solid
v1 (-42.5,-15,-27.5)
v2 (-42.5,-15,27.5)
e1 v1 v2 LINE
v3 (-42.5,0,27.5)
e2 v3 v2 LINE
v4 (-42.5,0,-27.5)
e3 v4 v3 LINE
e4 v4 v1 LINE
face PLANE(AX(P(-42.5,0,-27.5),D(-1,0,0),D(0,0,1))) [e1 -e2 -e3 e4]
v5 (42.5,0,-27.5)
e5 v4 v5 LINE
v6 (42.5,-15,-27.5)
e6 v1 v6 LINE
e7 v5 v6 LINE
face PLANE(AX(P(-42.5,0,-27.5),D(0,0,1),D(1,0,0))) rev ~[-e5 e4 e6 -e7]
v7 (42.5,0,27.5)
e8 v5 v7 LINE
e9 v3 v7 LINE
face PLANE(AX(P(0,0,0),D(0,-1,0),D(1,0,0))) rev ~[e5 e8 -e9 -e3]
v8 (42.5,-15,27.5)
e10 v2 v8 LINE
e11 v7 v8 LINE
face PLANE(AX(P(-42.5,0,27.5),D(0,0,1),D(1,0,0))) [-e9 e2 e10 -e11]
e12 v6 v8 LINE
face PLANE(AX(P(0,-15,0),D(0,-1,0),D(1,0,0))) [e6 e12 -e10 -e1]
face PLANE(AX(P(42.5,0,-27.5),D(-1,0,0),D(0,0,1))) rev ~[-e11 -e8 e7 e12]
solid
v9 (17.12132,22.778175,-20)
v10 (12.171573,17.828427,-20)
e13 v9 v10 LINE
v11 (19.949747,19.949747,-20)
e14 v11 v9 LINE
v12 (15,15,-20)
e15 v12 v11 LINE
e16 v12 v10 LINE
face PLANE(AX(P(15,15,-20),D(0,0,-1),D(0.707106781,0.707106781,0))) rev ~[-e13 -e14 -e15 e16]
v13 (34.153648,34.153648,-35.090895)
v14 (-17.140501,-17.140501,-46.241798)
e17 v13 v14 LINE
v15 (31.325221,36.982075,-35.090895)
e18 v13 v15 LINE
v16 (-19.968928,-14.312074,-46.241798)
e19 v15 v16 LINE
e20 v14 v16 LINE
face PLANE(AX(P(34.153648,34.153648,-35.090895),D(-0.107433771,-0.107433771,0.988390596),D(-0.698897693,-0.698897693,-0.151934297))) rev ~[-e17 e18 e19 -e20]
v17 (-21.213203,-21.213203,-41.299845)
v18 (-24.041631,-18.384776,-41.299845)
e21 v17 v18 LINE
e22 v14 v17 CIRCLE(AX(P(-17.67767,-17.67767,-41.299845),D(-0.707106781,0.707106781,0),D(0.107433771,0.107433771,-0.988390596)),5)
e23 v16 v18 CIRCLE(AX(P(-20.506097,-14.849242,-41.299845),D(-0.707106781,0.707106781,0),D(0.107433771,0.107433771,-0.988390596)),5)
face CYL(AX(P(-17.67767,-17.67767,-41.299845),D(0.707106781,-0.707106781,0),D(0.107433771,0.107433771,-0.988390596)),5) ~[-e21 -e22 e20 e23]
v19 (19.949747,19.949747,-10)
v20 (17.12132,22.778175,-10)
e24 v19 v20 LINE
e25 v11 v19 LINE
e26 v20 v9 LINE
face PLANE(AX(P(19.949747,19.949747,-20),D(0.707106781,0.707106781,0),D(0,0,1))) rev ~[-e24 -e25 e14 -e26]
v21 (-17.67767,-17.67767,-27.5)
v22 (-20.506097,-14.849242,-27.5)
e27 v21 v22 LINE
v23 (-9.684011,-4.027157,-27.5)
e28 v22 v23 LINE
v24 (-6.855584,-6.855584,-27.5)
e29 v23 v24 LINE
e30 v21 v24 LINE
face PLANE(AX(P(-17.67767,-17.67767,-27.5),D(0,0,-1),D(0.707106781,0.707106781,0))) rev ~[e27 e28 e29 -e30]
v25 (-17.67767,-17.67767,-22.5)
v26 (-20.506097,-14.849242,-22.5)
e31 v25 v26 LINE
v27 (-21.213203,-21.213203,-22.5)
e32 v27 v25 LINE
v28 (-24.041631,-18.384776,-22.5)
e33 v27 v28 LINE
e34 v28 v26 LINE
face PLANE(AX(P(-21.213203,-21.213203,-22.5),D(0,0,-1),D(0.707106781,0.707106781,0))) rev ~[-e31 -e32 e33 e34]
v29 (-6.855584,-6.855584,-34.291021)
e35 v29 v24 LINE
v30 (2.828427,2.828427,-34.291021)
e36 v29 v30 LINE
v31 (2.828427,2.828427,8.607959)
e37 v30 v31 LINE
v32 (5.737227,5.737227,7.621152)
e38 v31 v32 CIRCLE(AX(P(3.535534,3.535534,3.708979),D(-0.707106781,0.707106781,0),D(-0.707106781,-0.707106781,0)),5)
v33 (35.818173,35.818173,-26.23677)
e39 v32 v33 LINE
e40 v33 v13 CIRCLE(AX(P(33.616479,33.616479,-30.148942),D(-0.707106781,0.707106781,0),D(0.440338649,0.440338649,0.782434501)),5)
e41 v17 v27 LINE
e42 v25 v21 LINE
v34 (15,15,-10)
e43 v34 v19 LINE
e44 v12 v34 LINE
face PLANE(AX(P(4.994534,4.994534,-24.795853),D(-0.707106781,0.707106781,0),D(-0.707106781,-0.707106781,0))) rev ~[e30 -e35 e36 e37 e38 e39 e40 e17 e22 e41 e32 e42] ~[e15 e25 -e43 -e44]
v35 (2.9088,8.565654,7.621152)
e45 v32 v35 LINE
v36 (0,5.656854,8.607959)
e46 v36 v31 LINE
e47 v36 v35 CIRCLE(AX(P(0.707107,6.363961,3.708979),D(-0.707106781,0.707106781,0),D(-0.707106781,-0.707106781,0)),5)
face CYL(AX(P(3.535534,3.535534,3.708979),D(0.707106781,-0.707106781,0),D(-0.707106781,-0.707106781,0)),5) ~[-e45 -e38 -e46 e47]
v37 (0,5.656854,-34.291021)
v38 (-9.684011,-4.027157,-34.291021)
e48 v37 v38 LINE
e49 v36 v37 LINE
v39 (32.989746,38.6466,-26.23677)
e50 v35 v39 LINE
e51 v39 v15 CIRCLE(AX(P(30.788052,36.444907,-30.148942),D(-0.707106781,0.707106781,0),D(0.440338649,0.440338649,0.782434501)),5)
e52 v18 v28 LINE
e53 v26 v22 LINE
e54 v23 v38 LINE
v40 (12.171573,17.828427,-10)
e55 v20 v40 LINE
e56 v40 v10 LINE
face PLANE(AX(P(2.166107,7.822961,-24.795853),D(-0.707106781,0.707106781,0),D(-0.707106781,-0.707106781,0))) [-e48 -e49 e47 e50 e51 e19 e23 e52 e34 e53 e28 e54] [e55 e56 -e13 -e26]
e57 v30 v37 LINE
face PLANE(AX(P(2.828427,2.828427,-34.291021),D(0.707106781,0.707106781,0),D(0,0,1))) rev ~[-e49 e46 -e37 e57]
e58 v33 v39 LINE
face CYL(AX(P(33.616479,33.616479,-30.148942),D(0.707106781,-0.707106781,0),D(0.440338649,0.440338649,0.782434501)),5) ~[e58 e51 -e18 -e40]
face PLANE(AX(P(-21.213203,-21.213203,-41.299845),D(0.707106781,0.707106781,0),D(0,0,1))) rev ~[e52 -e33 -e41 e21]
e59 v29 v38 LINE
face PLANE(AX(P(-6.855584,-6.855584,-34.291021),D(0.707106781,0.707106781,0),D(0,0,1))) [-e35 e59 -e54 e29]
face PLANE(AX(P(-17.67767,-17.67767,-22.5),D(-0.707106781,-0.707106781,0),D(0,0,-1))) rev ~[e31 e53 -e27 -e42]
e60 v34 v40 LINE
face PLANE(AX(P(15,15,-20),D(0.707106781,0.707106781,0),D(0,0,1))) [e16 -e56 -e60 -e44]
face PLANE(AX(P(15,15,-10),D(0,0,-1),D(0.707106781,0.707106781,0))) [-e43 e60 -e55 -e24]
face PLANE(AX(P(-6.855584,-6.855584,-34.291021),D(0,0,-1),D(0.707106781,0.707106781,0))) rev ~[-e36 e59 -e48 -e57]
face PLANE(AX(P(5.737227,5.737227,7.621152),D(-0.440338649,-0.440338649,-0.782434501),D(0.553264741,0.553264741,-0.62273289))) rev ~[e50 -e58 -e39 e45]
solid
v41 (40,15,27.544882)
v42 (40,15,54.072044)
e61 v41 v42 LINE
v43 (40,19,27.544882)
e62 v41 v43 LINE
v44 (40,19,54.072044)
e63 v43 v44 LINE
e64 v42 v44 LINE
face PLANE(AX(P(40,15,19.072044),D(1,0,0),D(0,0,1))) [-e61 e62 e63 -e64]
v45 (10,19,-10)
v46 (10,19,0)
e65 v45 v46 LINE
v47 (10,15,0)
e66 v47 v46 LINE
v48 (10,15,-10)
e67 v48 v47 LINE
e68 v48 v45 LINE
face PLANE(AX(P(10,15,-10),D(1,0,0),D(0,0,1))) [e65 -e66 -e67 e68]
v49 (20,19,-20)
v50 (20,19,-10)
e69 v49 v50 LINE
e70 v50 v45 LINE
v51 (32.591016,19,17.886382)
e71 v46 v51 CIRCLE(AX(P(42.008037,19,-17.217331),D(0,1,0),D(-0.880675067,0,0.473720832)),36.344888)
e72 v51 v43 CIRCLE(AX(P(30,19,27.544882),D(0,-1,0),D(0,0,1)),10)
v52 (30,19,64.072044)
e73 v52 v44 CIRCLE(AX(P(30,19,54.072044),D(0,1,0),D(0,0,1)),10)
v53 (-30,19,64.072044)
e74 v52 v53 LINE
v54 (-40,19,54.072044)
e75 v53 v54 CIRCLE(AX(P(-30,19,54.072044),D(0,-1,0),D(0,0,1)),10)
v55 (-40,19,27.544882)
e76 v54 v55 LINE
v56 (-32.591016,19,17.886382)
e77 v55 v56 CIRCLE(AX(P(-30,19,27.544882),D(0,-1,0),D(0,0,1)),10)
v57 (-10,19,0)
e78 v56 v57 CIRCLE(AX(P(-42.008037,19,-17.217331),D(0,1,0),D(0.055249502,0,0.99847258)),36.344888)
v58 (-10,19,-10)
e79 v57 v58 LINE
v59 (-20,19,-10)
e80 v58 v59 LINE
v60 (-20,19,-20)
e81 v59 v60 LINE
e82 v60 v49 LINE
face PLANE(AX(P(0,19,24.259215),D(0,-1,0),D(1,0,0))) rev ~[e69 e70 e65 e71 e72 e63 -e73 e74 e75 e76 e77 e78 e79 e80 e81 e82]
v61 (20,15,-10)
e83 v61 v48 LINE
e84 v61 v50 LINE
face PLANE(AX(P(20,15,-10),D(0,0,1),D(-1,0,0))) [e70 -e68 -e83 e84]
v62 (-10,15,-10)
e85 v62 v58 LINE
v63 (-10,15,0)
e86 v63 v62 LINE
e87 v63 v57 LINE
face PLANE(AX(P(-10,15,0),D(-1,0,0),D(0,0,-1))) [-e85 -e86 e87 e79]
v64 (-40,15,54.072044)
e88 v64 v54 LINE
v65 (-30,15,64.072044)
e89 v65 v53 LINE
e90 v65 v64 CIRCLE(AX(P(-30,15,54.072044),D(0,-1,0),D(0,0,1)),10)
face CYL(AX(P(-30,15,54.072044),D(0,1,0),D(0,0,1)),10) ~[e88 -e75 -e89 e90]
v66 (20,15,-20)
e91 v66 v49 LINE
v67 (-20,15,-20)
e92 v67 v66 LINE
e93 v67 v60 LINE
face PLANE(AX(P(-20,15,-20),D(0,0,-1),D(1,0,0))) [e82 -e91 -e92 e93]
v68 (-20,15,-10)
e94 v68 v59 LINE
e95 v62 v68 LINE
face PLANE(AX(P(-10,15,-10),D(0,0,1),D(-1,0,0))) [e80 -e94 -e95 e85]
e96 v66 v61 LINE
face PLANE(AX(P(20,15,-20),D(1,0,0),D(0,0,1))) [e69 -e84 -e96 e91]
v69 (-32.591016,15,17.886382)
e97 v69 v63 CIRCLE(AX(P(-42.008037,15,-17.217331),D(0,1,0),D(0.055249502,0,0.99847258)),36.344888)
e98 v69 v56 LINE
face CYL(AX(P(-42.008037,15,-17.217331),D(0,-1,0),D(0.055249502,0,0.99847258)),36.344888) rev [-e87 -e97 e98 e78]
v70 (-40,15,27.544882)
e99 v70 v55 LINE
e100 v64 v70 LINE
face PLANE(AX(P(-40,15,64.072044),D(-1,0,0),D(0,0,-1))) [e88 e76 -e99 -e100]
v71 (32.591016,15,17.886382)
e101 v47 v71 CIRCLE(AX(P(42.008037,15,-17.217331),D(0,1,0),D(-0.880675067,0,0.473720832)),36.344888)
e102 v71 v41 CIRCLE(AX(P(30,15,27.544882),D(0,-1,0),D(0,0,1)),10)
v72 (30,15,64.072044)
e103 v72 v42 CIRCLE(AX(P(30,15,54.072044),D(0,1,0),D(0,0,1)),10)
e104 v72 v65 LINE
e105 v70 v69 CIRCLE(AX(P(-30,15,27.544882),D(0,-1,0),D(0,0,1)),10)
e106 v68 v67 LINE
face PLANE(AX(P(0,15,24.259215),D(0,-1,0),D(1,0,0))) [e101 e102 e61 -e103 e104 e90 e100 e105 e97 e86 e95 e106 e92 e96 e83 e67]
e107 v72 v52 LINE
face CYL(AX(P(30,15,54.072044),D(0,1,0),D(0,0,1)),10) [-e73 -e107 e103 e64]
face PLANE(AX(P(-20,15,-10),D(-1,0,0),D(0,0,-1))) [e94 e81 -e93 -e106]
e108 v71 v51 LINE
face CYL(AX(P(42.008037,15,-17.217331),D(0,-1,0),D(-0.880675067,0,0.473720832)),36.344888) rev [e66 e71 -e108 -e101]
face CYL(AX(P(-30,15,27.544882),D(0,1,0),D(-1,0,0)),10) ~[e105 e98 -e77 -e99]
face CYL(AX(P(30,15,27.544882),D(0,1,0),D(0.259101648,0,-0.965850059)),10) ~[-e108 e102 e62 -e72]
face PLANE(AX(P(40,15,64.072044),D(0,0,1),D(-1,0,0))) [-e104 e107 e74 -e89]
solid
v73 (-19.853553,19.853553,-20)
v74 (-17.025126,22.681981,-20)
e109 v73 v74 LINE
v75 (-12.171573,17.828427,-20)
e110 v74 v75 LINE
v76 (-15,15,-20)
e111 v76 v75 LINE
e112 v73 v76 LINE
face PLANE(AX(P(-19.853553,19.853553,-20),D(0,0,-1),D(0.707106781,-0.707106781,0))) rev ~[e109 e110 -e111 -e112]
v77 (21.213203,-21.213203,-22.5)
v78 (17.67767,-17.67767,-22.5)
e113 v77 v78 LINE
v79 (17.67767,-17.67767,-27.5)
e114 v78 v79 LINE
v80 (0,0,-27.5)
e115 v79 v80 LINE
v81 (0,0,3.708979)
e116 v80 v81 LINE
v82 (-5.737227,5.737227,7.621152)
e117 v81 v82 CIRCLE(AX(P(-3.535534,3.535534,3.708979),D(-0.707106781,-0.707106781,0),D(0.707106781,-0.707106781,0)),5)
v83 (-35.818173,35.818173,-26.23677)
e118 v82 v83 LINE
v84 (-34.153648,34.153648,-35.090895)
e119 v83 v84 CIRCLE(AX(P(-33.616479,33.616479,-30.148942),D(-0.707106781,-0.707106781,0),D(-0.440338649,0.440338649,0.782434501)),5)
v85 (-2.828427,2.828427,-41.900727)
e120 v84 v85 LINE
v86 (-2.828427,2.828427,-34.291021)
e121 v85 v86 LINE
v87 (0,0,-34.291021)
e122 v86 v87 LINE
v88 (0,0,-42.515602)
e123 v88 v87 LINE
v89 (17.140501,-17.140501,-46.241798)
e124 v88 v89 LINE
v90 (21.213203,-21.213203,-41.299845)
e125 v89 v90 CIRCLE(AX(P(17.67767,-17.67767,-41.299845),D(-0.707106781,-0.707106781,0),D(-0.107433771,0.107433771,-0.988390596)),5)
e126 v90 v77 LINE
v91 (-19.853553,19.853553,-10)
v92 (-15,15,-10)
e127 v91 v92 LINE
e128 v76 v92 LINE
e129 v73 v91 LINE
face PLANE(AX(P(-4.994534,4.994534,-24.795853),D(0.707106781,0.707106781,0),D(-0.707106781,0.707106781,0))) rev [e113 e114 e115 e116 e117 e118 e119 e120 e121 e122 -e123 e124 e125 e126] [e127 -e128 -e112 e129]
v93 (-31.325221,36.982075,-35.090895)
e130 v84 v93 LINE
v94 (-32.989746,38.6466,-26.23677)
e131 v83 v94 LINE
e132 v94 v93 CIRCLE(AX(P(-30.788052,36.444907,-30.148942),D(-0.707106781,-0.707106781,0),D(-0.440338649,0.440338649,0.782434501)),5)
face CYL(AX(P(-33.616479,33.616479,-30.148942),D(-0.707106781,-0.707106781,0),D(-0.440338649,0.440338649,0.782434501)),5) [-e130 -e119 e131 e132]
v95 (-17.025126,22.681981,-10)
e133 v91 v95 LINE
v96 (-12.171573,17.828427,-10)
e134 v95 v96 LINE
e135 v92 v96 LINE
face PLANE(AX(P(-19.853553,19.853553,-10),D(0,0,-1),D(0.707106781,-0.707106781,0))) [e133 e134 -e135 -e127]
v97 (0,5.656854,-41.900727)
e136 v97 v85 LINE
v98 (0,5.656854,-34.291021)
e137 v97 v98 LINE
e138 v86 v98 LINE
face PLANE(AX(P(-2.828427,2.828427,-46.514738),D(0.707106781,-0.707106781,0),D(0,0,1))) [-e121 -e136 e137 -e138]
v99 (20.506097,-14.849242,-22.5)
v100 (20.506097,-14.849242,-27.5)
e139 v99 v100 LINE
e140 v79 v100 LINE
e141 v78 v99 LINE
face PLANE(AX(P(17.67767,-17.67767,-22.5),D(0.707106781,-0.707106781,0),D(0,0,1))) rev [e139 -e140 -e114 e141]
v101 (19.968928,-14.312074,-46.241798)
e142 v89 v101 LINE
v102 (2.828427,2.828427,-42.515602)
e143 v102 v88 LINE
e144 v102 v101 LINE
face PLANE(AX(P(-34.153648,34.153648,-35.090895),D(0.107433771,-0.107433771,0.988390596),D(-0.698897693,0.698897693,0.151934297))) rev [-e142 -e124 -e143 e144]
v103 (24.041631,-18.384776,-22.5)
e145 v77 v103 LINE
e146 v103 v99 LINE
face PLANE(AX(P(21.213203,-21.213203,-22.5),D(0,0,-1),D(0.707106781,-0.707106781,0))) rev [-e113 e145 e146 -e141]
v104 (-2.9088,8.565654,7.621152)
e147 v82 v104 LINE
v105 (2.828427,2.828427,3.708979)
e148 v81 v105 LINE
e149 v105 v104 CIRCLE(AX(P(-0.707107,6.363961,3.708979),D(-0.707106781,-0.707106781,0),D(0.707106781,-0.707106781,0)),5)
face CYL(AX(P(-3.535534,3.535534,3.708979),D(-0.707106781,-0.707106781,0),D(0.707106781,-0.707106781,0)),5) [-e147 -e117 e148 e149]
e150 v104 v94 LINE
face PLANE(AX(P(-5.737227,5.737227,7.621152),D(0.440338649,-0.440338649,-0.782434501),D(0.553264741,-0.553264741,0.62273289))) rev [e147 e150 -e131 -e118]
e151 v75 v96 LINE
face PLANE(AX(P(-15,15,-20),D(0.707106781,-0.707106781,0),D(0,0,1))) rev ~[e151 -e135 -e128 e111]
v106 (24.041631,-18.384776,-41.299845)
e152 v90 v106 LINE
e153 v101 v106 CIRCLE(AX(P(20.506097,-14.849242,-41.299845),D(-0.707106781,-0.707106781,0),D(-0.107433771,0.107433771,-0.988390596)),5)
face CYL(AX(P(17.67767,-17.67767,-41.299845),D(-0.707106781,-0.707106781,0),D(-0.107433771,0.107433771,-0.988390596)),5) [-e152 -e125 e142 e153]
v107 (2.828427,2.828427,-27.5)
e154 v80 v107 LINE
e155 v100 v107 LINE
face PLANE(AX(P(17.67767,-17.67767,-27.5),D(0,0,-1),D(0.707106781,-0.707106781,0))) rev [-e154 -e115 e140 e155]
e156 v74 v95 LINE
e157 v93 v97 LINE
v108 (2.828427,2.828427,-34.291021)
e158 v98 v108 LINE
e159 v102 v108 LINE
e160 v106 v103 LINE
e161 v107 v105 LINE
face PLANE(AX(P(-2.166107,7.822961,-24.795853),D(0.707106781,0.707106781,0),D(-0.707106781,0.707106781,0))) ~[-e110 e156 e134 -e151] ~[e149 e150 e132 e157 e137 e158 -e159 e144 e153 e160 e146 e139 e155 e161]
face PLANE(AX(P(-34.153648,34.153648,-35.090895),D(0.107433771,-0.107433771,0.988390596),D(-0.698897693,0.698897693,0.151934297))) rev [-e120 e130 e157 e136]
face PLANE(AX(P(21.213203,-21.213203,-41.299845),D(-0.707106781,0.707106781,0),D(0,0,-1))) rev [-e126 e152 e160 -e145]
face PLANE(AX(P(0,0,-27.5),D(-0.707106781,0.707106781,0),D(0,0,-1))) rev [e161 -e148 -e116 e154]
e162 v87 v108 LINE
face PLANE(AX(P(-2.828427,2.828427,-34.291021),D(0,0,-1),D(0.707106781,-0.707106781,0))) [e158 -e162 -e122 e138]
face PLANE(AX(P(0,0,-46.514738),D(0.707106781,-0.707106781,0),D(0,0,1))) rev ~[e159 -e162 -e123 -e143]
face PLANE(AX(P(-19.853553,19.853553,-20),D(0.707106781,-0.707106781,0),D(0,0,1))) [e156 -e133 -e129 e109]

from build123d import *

# Parameters (mm, degrees)
F0_W      = 85
F0_H      = 55
F1_DEPTH  = 15
F5_DEPTH  = 4
F7_W      = 13.6952600442
F7_H      = 45
F8_DEPTH  = 25
F9_W      = 4
F9_H      = 1.4558660838
F10_DEPTH = 25
F11_W     = 4
F11_H     = 12.2237176445
F12_DEPTH = 4
F15_DEPTH = 4
F16_W     = 6.8639610307
F16_H     = 10
F17_DEPTH = 25
F18_W     = 7
F18_H     = 10
F19_DEPTH = 25
F20_R     = 10


with BuildPart() as f1:
    # F0 (on Front) → F1 (new body)
    with BuildSketch(Plane.XZ):
        Rectangle(F0_W, F0_H)
    extrude(amount=F1_DEPTH)

    # F9 (on face) → F10 (cut)
    with BuildSketch(Plane(origin=(2.8284271247, 2.8284271247, 0), x_dir=(-0.7071067812, 0.7071067812, 0), z_dir=(0.7071067812, 0.7071067812, 0))):
        with Locations((2, -49.5630876647)):
            Rectangle(F9_W, F9_H)
    extrude(amount=-F10_DEPTH, mode=Mode.SUBTRACT)


with BuildPart() as f5:
    # F4 (on line) → F5 (new body)
    with BuildSketch(Plane(origin=(0, 0, 0), x_dir=(-0.7071067812, -0.7071067812, 0), z_dir=(-0.7071067812, 0.7071067812, 0))):
        with BuildLine():
            Line((25, -27.5), (0, -27.5))
            Line((0, -27.5), (0, 3.7089792934))
            ThreePointArc((0, 3.7089792934), (-2.8284017695, 8.2127733746), (-8.1136644502, 7.6211517963))
            Line((-8.1136644502, 7.6211517963), (-50.6545456419, -26.236769691))
            ThreePointArc((-50.6545456419, -26.236769691), (-52.3730201924, -31.4336338606), (-48.3005526751, -35.0908951718))
            Line((-48.3005526751, -35.0908951718), (24.2403285166, -46.2417982796))
            ThreePointArc((24.2403285166, -46.2417982796), (28.2558902456, -45.0944702776), (30, -41.2998453016))
            Line((30, -41.2998453016), (30, -22.5))
            Line((30, -22.5), (25, -22.5))
            Line((25, -22.5), (25, -27.5))
        make_face()
    extrude(amount=F5_DEPTH)


with BuildPart() as f6_1:
    # F6: instance of F5
    add(f5.part.mirror(Plane.YZ))

    # F11 (on face) → F12 (cut)
    with BuildSketch(Plane(origin=(0, 0, 0), x_dir=(0.7071067812, -0.7071067812, 0), z_dir=(-0.7071067812, -0.7071067812, 0))):
        with Locations((-2, -40.4028795288)):
            Rectangle(F11_W, F11_H)
    extrude(amount=-F12_DEPTH, mode=Mode.SUBTRACT)

    # F16 (on face) → F17 (cut)
    with BuildSketch(Plane(origin=(0, 0, 0), x_dir=(0.7071067812, -0.7071067812, 0), z_dir=(-0.7071067812, -0.7071067812, 0))):
        with Locations((-24.6451839509, -15)):
            Rectangle(F16_W, F16_H)
    extrude(amount=-F17_DEPTH, mode=Mode.SUBTRACT)


with BuildPart() as f5_1:
    add(f5.part)

    # F7 (on face) → F8 (cut)
    with BuildSketch(Plane(origin=(0, 0, 0), x_dir=(0.7071067812, 0.7071067812, 0), z_dir=(0.7071067812, -0.7071067812, 0))):
        with Locations((-2.8476300221, -11.7910207066)):
            Rectangle(F7_W, F7_H)
    extrude(amount=-F8_DEPTH, mode=Mode.SUBTRACT)

    # F18 (on face) → F19 (cut)
    with BuildSketch(Plane(origin=(0, 0, 0), x_dir=(0.7071067812, 0.7071067812, 0), z_dir=(0.7071067812, -0.7071067812, 0))):
        with Locations((24.7132034356, -15)):
            Rectangle(F18_W, F18_H)
    extrude(amount=-F19_DEPTH, mode=Mode.SUBTRACT)


with BuildPart() as f15:
    # F14 (on offset) → F15 (new body)
    with BuildSketch(Plane.XZ.offset(-15)):
        with BuildLine():
            Line((40, 64.0720436681), (-40, 64.0720436681))
            Line((-40, 64.0720436681), (-40, 19.0720436681))
            ThreePointArc((-40, 19.0720436681), (-22.509087408, 13.4541849351), (-10, 0))
            Line((-10, 0), (-10, -10))
            Line((-10, -10), (-20, -10))
            Line((-20, -10), (-20, -20))
            Line((-20, -20), (-10, -20))
            Line((-10, -20), (10, -20))
            Line((10, -20), (20, -20))
            Line((20, -20), (20, -10))
            Line((20, -10), (10, -10))
            Line((10, -10), (10, 0))
            ThreePointArc((10, 0), (22.509087408, 13.4541849351), (40, 19.0720436681))
            Line((40, 19.0720436681), (40, 64.0720436681))
        make_face()
    extrude(amount=-F15_DEPTH)

    # F20
    f20_edges = [f15.edges().sort_by_distance(p)[0] for p in [
        (40, 17, 64.072044),
        (40, 17, 19.072044),
        (-40, 17, 64.072044),
        (-40, 17, 19.072044),
    ]]
    fillet(f20_edges, radius=F20_R)


solid = Compound([f1.part, f6_1.part, f5_1.part, f15.part])
